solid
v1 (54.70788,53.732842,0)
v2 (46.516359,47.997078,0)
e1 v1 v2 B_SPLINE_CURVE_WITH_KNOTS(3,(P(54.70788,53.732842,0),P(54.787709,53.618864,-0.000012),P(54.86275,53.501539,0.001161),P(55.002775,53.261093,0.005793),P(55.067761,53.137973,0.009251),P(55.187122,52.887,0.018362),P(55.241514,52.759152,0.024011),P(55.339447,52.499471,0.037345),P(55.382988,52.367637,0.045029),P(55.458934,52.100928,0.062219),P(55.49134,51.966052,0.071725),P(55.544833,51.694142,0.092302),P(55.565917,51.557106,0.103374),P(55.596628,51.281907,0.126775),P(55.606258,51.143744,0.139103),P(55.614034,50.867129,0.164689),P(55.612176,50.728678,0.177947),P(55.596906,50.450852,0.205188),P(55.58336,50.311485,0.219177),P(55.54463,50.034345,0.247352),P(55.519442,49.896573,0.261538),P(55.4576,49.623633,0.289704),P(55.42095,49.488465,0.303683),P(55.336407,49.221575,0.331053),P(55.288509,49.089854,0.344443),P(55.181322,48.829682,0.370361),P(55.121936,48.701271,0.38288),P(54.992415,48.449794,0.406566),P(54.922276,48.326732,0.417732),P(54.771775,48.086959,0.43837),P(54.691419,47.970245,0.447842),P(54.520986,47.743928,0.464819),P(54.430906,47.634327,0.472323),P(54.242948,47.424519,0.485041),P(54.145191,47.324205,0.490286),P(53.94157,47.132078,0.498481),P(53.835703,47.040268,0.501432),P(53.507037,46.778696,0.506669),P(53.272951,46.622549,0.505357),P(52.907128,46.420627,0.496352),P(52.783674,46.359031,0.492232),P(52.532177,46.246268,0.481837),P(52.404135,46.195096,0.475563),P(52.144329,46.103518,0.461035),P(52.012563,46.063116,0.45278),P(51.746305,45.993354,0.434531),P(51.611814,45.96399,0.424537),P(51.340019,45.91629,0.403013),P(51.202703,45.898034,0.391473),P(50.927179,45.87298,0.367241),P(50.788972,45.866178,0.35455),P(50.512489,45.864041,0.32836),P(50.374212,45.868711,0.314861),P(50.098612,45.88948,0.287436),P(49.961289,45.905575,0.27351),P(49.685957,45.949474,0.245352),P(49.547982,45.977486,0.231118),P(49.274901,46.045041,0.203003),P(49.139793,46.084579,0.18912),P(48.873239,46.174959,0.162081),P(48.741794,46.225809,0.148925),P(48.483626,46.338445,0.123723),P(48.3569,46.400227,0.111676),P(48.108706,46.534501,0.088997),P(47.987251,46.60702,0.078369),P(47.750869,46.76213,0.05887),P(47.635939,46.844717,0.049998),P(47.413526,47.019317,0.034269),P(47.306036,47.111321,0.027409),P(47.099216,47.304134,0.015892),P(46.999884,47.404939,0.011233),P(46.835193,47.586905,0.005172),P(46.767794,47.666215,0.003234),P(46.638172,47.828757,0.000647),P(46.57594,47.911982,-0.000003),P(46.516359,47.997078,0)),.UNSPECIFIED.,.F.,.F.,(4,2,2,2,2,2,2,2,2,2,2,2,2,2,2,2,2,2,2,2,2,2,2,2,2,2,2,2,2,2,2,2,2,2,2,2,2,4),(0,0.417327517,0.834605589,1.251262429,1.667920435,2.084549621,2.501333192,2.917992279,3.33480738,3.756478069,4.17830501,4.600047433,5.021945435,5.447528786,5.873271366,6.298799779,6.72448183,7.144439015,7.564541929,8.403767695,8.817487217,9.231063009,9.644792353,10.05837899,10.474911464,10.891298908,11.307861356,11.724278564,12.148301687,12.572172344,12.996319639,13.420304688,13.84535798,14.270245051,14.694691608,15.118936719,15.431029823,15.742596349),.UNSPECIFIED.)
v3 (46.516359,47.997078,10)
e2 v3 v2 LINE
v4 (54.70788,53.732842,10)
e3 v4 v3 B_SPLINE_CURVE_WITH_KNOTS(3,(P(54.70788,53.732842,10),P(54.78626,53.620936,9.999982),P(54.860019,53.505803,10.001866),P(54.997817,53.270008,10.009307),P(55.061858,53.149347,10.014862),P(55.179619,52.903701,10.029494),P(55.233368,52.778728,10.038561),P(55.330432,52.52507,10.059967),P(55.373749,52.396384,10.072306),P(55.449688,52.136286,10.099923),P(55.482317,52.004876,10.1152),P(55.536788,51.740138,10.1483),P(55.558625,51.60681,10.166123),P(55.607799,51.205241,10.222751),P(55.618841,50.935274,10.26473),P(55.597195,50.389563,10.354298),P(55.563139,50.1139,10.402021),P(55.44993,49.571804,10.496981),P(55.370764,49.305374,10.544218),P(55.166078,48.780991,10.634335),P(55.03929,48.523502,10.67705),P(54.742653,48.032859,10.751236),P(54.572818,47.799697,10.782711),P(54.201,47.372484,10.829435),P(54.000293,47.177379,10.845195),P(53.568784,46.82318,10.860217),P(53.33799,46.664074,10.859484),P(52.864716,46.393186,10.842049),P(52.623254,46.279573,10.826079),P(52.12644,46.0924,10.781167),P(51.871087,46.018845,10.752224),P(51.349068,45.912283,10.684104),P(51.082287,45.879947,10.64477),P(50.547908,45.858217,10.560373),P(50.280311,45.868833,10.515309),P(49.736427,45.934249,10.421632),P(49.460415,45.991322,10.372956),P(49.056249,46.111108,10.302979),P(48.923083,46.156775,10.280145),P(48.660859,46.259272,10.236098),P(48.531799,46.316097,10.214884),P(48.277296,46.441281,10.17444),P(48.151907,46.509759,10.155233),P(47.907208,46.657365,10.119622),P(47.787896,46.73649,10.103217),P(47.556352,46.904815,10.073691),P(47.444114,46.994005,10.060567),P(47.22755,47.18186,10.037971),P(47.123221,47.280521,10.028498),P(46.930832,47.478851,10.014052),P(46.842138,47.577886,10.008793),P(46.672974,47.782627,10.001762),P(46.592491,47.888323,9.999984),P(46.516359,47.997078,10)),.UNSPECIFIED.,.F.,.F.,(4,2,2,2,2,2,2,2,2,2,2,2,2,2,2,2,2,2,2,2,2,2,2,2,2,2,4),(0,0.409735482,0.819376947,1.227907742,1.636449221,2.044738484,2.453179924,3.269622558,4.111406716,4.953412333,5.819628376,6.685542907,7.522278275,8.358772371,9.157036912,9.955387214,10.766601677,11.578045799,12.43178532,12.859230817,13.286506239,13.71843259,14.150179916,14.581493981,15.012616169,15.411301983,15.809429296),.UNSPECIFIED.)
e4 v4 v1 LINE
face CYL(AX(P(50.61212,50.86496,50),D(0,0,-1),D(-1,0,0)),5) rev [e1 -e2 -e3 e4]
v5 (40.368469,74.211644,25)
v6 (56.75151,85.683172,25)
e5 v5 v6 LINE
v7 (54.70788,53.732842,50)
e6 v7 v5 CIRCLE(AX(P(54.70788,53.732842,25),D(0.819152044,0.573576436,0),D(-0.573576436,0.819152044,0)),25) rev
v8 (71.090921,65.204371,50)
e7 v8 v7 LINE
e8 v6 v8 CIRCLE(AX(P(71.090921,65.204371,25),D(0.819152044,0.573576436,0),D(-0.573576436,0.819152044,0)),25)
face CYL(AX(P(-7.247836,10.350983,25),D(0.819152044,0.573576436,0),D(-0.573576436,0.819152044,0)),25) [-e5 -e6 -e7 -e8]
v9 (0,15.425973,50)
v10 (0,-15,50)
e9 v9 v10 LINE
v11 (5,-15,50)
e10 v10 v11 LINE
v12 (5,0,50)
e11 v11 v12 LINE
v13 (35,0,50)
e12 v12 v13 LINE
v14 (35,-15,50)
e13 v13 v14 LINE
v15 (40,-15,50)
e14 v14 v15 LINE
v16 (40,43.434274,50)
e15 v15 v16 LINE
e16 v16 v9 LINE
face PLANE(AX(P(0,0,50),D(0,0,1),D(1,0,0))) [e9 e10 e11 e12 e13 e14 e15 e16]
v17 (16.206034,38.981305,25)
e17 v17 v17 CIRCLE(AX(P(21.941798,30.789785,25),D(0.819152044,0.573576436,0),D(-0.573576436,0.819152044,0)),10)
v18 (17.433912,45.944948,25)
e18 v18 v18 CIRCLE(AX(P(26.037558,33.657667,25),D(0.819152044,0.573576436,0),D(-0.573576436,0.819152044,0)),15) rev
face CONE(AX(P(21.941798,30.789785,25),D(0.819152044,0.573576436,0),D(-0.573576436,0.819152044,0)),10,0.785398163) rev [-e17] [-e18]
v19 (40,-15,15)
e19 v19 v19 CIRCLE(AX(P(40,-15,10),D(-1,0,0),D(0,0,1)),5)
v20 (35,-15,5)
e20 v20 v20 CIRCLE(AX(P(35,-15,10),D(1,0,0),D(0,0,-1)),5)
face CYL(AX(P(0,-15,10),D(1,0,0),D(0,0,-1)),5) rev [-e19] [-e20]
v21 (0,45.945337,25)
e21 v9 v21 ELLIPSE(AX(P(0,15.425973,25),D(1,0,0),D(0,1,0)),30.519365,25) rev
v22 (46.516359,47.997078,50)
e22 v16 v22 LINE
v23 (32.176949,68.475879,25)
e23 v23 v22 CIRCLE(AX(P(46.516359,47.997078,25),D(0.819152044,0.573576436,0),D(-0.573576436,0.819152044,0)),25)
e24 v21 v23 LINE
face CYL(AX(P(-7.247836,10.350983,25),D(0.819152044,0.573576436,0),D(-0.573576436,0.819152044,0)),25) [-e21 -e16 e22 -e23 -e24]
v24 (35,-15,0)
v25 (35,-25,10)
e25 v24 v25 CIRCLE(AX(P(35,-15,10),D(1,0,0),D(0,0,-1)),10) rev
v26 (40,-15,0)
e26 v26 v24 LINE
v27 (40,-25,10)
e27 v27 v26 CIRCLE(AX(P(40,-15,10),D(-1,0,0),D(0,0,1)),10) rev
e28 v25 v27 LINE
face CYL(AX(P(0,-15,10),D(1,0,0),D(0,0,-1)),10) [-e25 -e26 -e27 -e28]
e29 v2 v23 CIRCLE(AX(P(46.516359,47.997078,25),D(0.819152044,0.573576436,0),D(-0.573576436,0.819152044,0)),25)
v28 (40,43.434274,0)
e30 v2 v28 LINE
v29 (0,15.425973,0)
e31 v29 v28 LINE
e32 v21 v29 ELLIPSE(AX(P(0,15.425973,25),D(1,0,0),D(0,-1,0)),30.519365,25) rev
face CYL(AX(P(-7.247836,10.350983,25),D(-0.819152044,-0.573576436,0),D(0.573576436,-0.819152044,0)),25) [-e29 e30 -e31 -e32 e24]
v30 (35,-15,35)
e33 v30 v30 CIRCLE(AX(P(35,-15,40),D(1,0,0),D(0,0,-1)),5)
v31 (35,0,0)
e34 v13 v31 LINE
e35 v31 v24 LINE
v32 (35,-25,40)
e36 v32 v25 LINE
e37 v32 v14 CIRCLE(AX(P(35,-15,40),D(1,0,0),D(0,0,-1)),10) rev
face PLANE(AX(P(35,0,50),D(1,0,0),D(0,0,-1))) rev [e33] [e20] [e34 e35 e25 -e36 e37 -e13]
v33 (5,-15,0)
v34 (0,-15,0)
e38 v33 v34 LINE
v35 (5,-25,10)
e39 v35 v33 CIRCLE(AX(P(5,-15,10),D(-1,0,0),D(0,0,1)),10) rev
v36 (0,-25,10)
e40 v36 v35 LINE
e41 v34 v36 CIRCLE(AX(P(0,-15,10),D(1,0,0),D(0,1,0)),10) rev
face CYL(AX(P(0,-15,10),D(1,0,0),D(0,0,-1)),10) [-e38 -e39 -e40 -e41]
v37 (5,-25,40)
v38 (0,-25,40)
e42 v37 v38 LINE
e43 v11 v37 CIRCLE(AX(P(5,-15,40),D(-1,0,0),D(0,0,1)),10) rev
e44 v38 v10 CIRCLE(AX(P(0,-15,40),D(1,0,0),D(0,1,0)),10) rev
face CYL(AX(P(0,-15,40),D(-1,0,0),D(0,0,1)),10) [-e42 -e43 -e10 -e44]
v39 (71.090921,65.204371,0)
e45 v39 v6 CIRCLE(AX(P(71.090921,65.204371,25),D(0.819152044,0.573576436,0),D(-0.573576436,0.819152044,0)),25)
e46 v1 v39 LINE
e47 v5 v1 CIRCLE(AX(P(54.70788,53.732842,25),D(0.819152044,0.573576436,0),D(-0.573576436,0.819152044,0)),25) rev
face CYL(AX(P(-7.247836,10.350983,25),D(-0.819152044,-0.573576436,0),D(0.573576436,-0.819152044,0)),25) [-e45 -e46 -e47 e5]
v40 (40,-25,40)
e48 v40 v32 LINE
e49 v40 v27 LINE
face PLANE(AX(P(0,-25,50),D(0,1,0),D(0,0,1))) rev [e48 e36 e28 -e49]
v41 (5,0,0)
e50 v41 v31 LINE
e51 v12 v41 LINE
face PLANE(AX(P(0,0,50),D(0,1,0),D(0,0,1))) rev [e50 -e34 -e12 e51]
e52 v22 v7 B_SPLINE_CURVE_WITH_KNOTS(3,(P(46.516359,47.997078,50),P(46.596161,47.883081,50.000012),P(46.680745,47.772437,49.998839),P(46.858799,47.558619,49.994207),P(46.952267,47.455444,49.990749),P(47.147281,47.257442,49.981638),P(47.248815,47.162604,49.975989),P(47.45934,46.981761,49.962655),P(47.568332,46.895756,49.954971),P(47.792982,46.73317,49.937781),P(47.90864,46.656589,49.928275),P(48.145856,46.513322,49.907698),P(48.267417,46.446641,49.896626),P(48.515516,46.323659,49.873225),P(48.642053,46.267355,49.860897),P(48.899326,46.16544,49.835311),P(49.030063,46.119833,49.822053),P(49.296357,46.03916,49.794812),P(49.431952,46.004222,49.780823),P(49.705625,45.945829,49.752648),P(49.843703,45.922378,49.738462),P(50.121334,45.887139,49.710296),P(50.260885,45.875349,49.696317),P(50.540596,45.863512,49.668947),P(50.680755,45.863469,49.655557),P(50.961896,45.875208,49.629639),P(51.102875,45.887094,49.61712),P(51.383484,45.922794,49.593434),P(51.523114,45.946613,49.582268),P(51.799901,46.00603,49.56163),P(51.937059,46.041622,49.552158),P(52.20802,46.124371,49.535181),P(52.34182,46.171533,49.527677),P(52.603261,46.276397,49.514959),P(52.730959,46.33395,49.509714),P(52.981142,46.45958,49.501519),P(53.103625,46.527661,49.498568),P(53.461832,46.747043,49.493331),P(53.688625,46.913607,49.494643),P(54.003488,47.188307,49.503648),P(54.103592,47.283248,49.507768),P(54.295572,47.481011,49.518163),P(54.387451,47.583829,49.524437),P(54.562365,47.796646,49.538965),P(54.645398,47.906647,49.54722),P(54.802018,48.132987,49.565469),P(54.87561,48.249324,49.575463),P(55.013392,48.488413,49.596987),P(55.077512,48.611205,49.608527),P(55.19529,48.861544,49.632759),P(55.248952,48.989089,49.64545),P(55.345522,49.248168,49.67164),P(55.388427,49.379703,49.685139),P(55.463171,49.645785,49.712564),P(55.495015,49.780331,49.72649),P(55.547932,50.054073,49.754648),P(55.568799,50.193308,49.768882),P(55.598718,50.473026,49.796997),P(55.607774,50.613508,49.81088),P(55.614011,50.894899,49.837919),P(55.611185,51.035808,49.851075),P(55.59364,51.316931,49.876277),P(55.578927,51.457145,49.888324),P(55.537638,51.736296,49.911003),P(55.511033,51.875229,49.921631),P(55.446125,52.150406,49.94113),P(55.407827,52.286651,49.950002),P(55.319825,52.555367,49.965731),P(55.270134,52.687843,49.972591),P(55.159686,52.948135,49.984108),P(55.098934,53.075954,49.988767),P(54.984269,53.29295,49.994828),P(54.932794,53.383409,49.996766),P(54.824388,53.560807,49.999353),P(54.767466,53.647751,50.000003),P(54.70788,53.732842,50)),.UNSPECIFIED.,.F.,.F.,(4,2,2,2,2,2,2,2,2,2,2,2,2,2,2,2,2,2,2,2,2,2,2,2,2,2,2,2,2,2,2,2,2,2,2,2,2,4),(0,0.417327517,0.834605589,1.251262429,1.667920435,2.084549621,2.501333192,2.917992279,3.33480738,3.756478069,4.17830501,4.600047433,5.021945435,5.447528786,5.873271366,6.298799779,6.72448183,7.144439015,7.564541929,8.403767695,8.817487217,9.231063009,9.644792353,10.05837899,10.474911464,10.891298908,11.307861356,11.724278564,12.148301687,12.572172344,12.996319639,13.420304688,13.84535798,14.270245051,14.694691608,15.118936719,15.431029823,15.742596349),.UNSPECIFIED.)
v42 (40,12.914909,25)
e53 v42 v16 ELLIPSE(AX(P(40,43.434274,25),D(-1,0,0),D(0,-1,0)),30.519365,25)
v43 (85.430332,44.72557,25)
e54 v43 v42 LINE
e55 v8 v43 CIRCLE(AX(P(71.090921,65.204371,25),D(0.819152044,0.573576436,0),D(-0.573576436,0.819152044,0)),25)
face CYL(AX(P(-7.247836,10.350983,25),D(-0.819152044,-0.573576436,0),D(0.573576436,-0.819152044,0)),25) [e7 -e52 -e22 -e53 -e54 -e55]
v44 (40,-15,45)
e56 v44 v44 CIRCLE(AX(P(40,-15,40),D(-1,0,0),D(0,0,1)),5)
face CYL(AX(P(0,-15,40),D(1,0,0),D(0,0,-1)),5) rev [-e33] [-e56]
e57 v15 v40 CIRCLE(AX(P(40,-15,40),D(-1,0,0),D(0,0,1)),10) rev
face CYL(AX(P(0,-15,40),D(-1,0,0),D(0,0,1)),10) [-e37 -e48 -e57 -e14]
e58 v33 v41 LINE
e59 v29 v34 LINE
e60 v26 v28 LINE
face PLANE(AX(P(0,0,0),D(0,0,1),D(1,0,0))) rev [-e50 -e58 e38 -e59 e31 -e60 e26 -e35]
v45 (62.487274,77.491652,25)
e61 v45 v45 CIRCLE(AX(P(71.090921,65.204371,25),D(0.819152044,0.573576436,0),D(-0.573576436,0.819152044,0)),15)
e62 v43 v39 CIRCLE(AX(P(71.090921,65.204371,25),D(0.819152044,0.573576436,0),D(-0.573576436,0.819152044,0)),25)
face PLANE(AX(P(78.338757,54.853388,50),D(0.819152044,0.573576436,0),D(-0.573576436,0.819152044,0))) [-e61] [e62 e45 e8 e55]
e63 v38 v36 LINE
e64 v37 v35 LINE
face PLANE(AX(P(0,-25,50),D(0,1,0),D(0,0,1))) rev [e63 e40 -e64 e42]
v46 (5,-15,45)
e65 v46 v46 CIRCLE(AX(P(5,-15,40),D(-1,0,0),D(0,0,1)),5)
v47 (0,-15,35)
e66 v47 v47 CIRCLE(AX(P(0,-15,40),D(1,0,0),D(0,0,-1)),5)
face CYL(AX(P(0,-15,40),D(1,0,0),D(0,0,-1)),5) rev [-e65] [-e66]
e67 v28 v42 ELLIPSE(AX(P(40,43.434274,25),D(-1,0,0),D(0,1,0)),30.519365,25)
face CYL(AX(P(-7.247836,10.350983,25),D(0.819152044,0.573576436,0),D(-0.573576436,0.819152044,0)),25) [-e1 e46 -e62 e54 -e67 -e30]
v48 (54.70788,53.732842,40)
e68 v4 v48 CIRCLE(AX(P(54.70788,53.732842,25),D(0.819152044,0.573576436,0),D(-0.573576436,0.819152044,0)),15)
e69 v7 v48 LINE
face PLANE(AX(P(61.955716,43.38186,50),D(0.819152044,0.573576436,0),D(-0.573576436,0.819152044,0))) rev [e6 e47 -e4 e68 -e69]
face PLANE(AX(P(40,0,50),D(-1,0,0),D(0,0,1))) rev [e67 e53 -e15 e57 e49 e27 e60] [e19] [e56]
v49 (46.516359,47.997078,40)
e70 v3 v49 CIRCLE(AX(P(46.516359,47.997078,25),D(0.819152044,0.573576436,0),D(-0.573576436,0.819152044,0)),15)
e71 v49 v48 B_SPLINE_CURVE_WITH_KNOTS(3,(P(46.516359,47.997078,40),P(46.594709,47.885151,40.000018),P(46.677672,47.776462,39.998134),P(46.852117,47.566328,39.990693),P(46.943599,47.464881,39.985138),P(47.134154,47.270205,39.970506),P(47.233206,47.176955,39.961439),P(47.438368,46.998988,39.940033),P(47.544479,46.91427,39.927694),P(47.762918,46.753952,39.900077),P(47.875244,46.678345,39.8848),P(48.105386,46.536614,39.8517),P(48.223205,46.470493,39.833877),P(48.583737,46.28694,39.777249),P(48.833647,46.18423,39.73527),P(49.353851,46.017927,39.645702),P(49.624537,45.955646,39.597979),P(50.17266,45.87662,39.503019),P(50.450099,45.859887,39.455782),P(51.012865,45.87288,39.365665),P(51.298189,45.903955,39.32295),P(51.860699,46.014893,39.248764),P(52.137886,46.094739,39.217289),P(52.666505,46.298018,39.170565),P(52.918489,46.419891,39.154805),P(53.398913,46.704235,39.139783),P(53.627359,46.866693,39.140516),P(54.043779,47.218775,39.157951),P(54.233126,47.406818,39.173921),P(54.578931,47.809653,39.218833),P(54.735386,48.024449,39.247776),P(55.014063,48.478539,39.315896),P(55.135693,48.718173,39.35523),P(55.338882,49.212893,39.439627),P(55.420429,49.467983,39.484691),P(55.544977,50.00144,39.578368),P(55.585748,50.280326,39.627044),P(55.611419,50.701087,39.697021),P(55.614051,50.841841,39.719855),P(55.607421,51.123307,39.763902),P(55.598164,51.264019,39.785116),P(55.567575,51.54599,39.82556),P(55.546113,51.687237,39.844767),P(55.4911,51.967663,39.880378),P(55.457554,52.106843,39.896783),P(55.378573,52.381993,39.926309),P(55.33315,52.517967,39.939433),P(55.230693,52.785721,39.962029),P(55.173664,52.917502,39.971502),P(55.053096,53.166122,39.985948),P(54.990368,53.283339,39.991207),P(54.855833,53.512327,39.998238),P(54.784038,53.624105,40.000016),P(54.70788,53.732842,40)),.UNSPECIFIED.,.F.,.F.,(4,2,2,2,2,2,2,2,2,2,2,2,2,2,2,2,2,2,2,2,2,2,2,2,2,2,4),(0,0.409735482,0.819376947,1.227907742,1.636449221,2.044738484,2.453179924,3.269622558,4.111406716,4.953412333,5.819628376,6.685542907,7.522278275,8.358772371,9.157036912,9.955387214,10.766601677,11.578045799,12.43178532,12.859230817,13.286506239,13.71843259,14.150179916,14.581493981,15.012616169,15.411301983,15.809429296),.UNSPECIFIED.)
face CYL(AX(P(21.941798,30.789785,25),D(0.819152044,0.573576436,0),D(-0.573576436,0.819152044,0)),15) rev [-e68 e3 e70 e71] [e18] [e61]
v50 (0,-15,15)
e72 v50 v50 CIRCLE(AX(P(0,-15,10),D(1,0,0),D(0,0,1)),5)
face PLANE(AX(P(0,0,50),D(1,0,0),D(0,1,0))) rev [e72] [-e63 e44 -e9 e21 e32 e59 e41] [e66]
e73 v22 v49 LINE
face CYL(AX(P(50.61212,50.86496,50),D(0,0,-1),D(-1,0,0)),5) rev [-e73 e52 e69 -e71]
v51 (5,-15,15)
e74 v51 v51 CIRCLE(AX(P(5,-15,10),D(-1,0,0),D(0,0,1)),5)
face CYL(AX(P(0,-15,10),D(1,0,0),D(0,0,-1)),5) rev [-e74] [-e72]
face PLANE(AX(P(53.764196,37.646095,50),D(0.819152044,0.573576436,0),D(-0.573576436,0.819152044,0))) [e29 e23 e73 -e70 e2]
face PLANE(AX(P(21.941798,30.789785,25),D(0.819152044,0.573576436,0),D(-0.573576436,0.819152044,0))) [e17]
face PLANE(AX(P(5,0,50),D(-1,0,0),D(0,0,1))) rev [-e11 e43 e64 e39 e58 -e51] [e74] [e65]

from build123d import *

# Parameters (mm, degrees)
BOSS_EXTRUDE1_DEPTH     = 50
SKETCH2_R               = 15
CUT_EXTRUDE1_DEPTH      = 60
CHAMFER1_SIZE           = 5
CUT_EXTRUDE2_DEPTH      = 128.713132763
CUT_EXTRUDE2_DEPTH_BACK = 128.713132763
SKETCH3_R               = 5
FILLET2_R               = 10
FILLET3_R               = 25


with BuildPart() as part:
    # Sketch1 → Boss-Extrude1 (new body)
    with BuildSketch(Plane.XY):
        with BuildLine():
            Line((5, -25), (5, 0))
            Line((5, 0), (35, 0))
            Line((35, 0), (35, -25))
            Line((35, -25), (40, -25))
            Line((40, -25), (40, 0))
            Line((40, 0), (40, 12.914909334))
            Line((40, 12.914909334), (85.43033171, 44.72557006))
            Line((85.43033171, 44.72557006), (56.751509892, 85.683172275))
            Line((56.751509892, 85.683172275), (40.368469006, 74.211643548))
            Line((40.368469006, 74.211643548), (54.707879915, 53.732842441))
            ThreePointArc((54.707879915, 53.732842441), (53.480001875, 46.769200037), (46.516359472, 47.997078077))
            Line((46.516359472, 47.997078077), (32.176948563, 68.475879184))
            Line((32.176948563, 68.475879184), (0, 45.945337244))
            Line((0, 45.945337244), (0, 0))
            Line((0, 0), (0, -25))
            Line((0, -25), (5, -25))
        make_face()
    extrude(amount=BOSS_EXTRUDE1_DEPTH)

    # Sketch2 → Cut-Extrude1 (cut)
    with BuildSketch(Plane(origin=(78.338757076, 54.853388238, 0), x_dir=(0, 0, -1), z_dir=(0.8191520442889928, 0.5735764363510449, 0))):
        with Locations(Location((-25, 12.636216929, 0), (0, 0, 90))):
            Circle(SKETCH2_R)
    extrude(amount=-CUT_EXTRUDE1_DEPTH, mode=Mode.SUBTRACT)

    # Chamfer1
    chamfer1_edges = [part.edges().sort_by_distance(p)[0] for p in [
        (30.545444689, 18.502504322, 25),
    ]]
    chamfer(chamfer1_edges, length=CHAMFER1_SIZE)

    # Sketch3 → Cut-Extrude2 (cut, two sides: drawn at the far end of the back side and taken through both)
    with BuildSketch(Plane(origin=(5, 0, 0), x_dir=(0, 0, -1), z_dir=(1, 0, 0)).offset(-CUT_EXTRUDE2_DEPTH_BACK)):
        with Locations((-40, -15)):
            Circle(SKETCH3_R)
        with Locations((-10, -15)):
            Circle(SKETCH3_R)
    extrude(amount=CUT_EXTRUDE2_DEPTH + CUT_EXTRUDE2_DEPTH_BACK, mode=Mode.SUBTRACT)

    # Fillet2
    fillet2_edges = [part.edges().sort_by_distance(p)[0] for p in [
        (37.5, -25, 0),
        (2.5, -25, 0),
        (2.5, -25, 50),
        (37.5, -25, 50),
    ]]
    fillet(fillet2_edges, radius=FILLET2_R)

    # Fillet3
    # the kernel refuses this fillet: 25 mm, written as the material it takes off along each edge
    with BuildSketch(Plane(origin=(83.373951331, 104.324406456, 0), x_dir=(0.5735764363510446, -0.8191520442889929, 0), z_dir=(-0.8191520442889929, -0.5735764363510447, 0)), Plane(origin=(83.373951331, 104.324406456, 50), x_dir=(0, 0, -1), z_dir=(-0.8191520442889929, -0.5735764363510447, 0))) as fillet3_piece_1:
        with BuildLine():
            CenterArc((FILLET3_R, FILLET3_R), FILLET3_R, 180, 90)
            Line((0, FILLET3_R), (0, 0))
            Line((0, 0), (FILLET3_R, 0))
        make_face()
    extrude(amount=164.28080115, mode=Mode.SUBTRACT)
    with BuildSketch(Plane(origin=(107.94851266, 121.531699547, 0), x_dir=(0.573576436351046, -0.8191520442889918, 0), z_dir=(-0.8191520442889919, -0.5735764363510462, 0)), Plane(origin=(107.94851266, 121.531699547, 50), x_dir=(0, 0, -1), z_dir=(-0.8191520442889919, -0.5735764363510462, 0))) as fillet3_piece_2:
        with BuildLine():
            CenterArc((FILLET3_R, FILLET3_R), FILLET3_R, 180, 90)
            Line((0, FILLET3_R), (0, 0))
            Line((0, 0), (FILLET3_R, 0))
        make_face()
    extrude(amount=145, mode=Mode.SUBTRACT)
    with BuildSketch(Plane(origin=(-11.197002768, -22.933617938, 0), x_dir=(-0.5735764363510454, 0.8191520442889921, 0), z_dir=(0.8191520442889924, 0.5735764363510455, 0))) as fillet3_piece_3_section:
        with BuildLine():
            CenterArc((FILLET3_R, FILLET3_R), FILLET3_R, 180, 90)
            Line((0, FILLET3_R), (0, 0))
            Line((0, 0), (FILLET3_R, 0))
        make_face()
    fillet3_piece_3 = extrude(amount=180.46019451, mode=Mode.PRIVATE)
    fillet3_piece_3 = split(fillet3_piece_3, bisect_by=Plane(origin=(40, 25.184030637, 6.00422592), z_dir=(1, 0, 0)), keep=Keep.TOP, mode=Mode.PRIVATE)
    add(fillet3_piece_3, mode=Mode.SUBTRACT)
    with BuildSketch(Plane(origin=(-11.197002768, -22.933617938, 50), x_dir=(0, 0, -1), z_dir=(0.8191520442889924, 0.5735764363510455, 0))) as fillet3_piece_4_section:
        with BuildLine():
            CenterArc((FILLET3_R, FILLET3_R), FILLET3_R, 180, 90)
            Line((0, FILLET3_R), (0, 0))
            Line((0, 0), (FILLET3_R, 0))
        make_face()
    fillet3_piece_4 = extrude(amount=180.46019451, mode=Mode.PRIVATE)
    fillet3_piece_4 = split(fillet3_piece_4, bisect_by=Plane(origin=(40, 25.184030637, 43.99577408), z_dir=(1, 0, 0)), keep=Keep.TOP, mode=Mode.PRIVATE)
    add(fillet3_piece_4, mode=Mode.SUBTRACT)


solid = part.part
